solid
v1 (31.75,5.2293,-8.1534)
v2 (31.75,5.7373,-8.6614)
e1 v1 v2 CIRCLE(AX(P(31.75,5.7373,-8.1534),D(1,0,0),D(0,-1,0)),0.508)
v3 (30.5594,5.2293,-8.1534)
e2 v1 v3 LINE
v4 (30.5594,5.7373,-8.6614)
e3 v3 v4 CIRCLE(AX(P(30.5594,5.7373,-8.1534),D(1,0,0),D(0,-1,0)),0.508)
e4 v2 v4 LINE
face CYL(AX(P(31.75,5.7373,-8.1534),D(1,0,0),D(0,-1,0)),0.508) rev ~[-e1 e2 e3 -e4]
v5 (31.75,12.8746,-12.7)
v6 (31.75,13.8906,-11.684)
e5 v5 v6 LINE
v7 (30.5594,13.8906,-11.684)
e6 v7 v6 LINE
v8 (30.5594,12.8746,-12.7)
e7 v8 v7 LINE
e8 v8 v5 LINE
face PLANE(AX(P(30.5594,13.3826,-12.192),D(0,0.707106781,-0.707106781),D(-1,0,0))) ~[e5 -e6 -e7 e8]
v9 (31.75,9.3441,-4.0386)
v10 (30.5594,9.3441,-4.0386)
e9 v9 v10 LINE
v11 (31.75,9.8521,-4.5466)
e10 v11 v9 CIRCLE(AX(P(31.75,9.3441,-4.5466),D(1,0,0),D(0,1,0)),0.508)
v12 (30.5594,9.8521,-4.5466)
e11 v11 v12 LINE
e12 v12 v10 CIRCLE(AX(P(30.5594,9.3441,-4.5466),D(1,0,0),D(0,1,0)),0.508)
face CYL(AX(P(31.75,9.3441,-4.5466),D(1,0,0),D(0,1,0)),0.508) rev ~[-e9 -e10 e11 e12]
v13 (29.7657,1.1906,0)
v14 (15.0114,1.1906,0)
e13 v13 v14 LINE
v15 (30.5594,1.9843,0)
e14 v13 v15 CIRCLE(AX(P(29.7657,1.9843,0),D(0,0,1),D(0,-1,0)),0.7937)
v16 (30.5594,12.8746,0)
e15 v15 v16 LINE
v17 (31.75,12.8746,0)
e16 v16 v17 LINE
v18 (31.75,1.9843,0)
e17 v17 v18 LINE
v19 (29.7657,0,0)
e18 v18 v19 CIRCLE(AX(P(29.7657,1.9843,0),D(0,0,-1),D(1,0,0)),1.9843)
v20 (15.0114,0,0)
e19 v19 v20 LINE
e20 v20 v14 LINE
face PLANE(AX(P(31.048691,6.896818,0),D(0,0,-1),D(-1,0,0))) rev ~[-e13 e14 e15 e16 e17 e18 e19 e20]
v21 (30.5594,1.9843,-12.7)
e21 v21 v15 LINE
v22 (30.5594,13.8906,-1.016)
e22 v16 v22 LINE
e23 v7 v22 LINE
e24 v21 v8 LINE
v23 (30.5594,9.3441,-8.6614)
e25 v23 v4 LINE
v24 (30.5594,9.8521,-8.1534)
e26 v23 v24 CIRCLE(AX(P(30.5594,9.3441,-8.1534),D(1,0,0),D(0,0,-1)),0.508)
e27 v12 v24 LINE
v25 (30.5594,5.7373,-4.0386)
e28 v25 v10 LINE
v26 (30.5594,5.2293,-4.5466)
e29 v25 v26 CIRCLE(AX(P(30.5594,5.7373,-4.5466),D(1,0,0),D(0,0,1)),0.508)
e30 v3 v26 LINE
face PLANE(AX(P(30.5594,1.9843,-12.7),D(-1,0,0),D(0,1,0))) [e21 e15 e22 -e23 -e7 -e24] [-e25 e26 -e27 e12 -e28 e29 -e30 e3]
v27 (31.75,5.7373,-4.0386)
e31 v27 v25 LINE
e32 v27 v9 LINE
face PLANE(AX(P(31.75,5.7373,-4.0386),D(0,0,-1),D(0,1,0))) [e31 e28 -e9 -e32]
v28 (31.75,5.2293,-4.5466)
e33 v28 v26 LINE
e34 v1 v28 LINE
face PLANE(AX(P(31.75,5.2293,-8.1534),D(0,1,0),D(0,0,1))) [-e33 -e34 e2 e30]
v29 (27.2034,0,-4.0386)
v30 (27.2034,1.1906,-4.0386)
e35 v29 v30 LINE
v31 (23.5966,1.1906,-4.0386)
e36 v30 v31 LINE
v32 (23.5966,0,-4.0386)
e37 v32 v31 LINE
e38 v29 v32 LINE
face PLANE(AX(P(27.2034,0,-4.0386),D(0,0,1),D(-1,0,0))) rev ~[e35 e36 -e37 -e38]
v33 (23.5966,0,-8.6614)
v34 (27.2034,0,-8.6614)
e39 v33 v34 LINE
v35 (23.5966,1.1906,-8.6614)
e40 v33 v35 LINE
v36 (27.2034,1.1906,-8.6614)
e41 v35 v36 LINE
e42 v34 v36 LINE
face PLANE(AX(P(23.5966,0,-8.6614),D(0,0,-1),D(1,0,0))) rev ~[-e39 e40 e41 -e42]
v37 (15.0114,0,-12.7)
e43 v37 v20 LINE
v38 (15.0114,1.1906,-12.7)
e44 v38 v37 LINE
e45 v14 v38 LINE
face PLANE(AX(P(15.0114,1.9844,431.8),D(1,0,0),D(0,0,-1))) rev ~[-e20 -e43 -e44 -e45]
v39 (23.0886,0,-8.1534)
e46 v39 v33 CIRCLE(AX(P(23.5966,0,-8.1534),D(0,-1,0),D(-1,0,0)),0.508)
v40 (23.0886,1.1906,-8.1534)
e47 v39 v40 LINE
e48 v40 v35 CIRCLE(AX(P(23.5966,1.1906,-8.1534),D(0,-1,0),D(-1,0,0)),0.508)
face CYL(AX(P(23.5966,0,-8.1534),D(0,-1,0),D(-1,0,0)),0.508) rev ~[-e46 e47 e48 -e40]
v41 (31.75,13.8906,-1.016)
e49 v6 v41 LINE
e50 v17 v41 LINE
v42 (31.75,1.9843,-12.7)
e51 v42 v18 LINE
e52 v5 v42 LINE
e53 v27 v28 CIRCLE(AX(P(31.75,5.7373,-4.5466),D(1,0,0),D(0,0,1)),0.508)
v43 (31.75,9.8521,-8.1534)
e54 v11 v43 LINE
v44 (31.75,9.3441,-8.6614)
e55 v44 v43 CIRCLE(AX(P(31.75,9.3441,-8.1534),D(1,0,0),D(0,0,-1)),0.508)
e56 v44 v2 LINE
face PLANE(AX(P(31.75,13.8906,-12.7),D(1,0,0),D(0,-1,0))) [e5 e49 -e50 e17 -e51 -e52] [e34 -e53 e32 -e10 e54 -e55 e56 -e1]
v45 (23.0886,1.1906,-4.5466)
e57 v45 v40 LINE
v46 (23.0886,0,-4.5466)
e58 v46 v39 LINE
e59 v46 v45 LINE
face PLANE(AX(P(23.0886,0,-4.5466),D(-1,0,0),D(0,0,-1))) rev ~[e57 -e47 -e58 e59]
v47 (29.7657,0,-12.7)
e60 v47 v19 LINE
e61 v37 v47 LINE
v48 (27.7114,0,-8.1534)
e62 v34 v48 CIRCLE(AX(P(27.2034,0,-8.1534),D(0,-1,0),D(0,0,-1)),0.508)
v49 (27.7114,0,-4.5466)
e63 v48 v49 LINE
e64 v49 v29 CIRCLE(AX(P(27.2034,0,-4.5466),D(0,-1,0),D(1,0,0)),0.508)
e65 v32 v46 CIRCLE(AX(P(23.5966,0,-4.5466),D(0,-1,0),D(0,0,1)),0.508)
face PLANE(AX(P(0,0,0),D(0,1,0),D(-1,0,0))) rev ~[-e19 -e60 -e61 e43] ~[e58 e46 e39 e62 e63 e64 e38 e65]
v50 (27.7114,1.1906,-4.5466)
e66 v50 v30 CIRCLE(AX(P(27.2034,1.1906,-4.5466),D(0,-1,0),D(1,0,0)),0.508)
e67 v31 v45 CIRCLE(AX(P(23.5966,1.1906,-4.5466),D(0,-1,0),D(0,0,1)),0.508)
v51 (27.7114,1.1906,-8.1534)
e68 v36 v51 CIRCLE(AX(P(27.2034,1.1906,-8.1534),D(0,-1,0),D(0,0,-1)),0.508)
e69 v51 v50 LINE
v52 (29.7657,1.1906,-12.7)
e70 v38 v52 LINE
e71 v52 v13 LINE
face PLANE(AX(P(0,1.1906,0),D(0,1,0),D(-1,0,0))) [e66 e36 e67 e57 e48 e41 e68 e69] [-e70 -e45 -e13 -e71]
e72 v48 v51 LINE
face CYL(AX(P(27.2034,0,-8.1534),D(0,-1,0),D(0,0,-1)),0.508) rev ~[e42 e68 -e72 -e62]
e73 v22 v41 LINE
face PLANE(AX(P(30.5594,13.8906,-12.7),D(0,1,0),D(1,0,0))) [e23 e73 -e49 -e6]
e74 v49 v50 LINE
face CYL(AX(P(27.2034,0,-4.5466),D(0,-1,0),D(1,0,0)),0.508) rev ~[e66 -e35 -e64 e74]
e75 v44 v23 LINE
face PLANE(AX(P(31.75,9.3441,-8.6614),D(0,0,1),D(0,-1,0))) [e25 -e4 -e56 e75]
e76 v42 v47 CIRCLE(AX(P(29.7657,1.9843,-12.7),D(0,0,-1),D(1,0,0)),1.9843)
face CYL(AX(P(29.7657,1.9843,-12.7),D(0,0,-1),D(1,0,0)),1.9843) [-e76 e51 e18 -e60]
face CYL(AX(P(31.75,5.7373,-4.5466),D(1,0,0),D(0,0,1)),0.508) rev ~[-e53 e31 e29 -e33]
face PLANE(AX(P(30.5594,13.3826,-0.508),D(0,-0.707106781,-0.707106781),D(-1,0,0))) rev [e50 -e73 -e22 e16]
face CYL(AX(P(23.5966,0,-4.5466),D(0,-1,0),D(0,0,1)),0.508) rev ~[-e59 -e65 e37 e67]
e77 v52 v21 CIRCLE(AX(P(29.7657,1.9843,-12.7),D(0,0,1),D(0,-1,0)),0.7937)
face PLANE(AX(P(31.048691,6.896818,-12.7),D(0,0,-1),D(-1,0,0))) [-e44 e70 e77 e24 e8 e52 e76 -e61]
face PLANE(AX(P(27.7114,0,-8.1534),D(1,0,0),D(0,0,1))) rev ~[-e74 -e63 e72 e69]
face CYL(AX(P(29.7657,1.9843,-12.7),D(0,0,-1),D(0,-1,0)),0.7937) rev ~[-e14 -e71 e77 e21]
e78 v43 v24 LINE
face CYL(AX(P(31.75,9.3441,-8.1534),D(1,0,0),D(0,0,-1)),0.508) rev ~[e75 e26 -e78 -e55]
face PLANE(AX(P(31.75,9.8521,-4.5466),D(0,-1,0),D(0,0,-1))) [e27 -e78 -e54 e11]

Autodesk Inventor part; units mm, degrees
ref_plane "YZ Plane" through (0, 0, 0) normal (1, 0, 0) x (0, 1, 0)
ref_plane "XZ Plane" through (0, 0, 0) normal (0, 1, 0) x (-1, 0, 0)
sketch "Sketch1" plane through (0, 0, 0) normal (0, 1, 0) x (-1, 0, 0)
  line L0 (-31.75, 0) -> (31.75, 0)
  line L1 (31.75, 0) -> (31.75, -12.7)
  line L2 (31.75, -12.7) -> (-31.75, -12.7)
  line L3 (-31.75, -12.7) -> (-31.75, 0)
  line L4 (31.75, 0) -> (-31.75, -12.7) construction
  point P0 (0, 0)
  point P1 (0, 0)
  dimension "d0" = 63.5
  dimension "d1" = 12.7
extrude "Plate1" add sketch "Sketch1" along normal blind 1.1906
sketch "Sketch2" plane through (30.5594, 0, -12.7) normal (1, 0, 0) x (0, 1, 0)
  line L0 (0, 12.7) -> (0, 0)
  line L1 (0, 0) -> (13.8906, 0)
  line L2 (13.8906, 0) -> (13.8906, 12.7)
  line L3 (13.8906, 12.7) -> (0, 12.7)
edge flange "Flanges" height 12.7 angle 90 thickness 1.1906 bend radius 0.7937 thickness toward (1, 0, 0) relief tear relief width 1.1906 relief depth 0.5953 corner gap 1.1906 corner form 0 edges at (31.75, 1.1906, -6.35) (-31.75, 1.1906, -6.35) wall of the first edge with corners at (30.5594, 0, 0) (30.5594, 0, -12.7) (30.5594, 13.8906, -12.7) (30.5594, 13.8906, 0)
bend "Bend1"
corner "Corner1"
sketch "Sketch3" plane through (31.75, 1.9844, -12.7) normal (1, 0, 0) x (0, 0, -1)
  line L0 (-8.1534, 7.8677) -> (-4.5466, 7.8677)
  line L1 (-4.0386, 7.3597) -> (-4.0386, 3.7529)
  line L2 (-4.5466, 3.2449) -> (-8.1534, 3.2449)
  line L3 (-8.6614, 3.7529) -> (-8.6614, 7.3597)
  arc A0 (-8.1534, 7.8677) -> (-8.6614, 7.3597) centre (-8.1534, 7.3597) ccw
  arc A1 (-4.0386, 7.3597) -> (-4.5466, 7.8677) centre (-4.5466, 7.3597) ccw
  arc A2 (-4.5466, 3.2449) -> (-4.0386, 3.7529) centre (-4.5466, 3.7529) ccw
  arc A3 (-8.6614, 3.7529) -> (-8.1534, 3.2449) centre (-8.1534, 3.7529) ccw
  line L4 (-12.7, 0) -> (-12.7, 11.9063) construction
  line L5 (-12.7, 11.9063) -> (0, 11.9063) construction
  line L6 (-8.1534, 7.3597) -> (-4.5466, 3.7529) construction
  point P0 (-12.7, -1.9844)
  point P1 (-4.0386, 3.2449)
  point P2 (-8.6614, 3.2449)
  point P3 (-6.35, 5.5563)
  dimension "d16" = 4.6228
  dimension "d17" = 0.508
  dimension "d20" = 6.35
  dimension "d21" = 6.35
extrude "Flange Stamp" cut sketch "Sketch3" against normal blind 1.1906
sketch "Sketch7" plane through (31.75, 1.9844, 0) normal (1, 0, 0) x (0, 0, -1)
  arc A0 (4.5466, 7.8677) -> (4.0386, 7.3597) centre (4.5466, 7.3597) ccw construction
  arc A1 (8.1534, 3.2449) -> (8.6614, 3.7529) centre (8.1534, 3.7529) ccw construction
  circle A2 centre (6.35, 5.5563) radius 2.1844
  line L0 (4.5466, 7.3597) -> (8.1534, 3.7529) construction
  point P0 (0, -1.9844)
  dimension "d46" = 4.3688
surface extrude "Flange Circle" sketch "Sketch7" against normal up to surface (1.1906 mm away) shown yes curves A2
ref_plane "Flange Pattern Plane" through (31.75, 7.5406, -4.5466) normal (0, 1, 0) x (1, 0, 0)
feature "Flange Pattern" [suppressed]
sketch "Sketch8" plane through (0, 0, 0) normal (0, -1, 0) x (1, 0, 0)
  line L0 (29.7656, 0) -> (-29.7656, 0) construction
  line L1 (27.2034, -4.0386) -> (23.5966, -4.0386)
  line L2 (23.0886, -4.5466) -> (23.0886, -8.1534)
  line L3 (23.5966, -8.6614) -> (27.2034, -8.6614)
  line L4 (27.7114, -8.1534) -> (27.7114, -4.5466)
  arc A0 (27.7114, -4.5466) -> (27.2034, -4.0386) centre (27.2034, -4.5466) ccw
  arc A1 (27.2034, -8.6614) -> (27.7114, -8.1534) centre (27.2034, -8.1534) ccw
  arc A2 (23.0886, -8.1534) -> (23.5966, -8.6614) centre (23.5966, -8.1534) ccw
  arc A3 (23.5966, -4.0386) -> (23.0886, -4.5466) centre (23.5966, -4.5466) ccw
  line L5 (27.2034, -4.5466) -> (23.5966, -8.1534) construction
  line L6 (31.75, 0) -> (31.75, -12.7) construction
  point P0 (0, 0)
  point P1 (23.0886, -8.6614)
  point P2 (27.7114, -8.6614)
  point P3 (25.4, -6.35)
  dimension "d49" = 4.6228
  dimension "d50" = 0.508
  dimension "d51" = 6.35
  dimension "d52" = 6.35
extrude "Body Stamp" cut sketch "Sketch8" against normal blind 1.1906
sketch "Sketch9" plane through (0, 0, 0) normal (0, -1, 0) x (1, 0, 0)
  arc A0 (27.7114, -4.5466) -> (27.2034, -4.0386) centre (27.2034, -4.5466) ccw construction
  arc A1 (23.0886, -8.1534) -> (23.5966, -8.6614) centre (23.5966, -8.1534) ccw construction
  line L0 (27.2034, -4.5466) -> (23.5966, -8.1534) construction
  circle A2 centre (25.4, -6.35) radius 2.1844
  point P0 (0, 0)
  dimension "d55" = 4.3688
surface extrude "Body Circle" sketch "Sketch9" against normal up to surface (1.1906 mm away) shown yes curves A2
feature "Body Pattern" [suppressed]
sketch "Arc Length" plane through (30.5594, 1.9844, 0) normal (0, 0, 1) x (1, 0, 0)
  line L0 (0, 0) -> (1.1906, 0) construction
  arc A0 (-0.7938, -0.7938) -> (0, 0) centre (-0.7938, 0) ccw construction
  line L1 (-0.7938, -1.9844) -> (-0.7938, -0.7938) construction
  arc A1 (-0.7938, -1.9844) -> (1.1906, 0) centre (-0.7938, 0) ccw construction
  point P0 (-30.5594, -1.9844)
  dimension "d85" = 3.117
  dimension "d92" = 1.2468
sketch "Sketch13" plane through (31.75, 13.8906, 0) normal (1, 0, 0) x (0, 0, -1)
  line L0 (0, 0) -> (12.7, 0) construction
  line L1 (62.4078, 0) -> (63.4238, -1.016)
  line L2 (63.4238, -1.016) -> (64.4398, 0)
  line L3 (62.4078, 0) -> (64.4398, 0)
  line L4 (12.7, -11.9063) -> (0, -11.9063) construction
  line L5 (63.4238, -10.8903) -> (61.3168, -12.9972)
  line L6 (61.3168, -12.9972) -> (63.4238, -15.1042)
  line L7 (63.4238, -15.1042) -> (65.5308, -12.9972)
  line L8 (65.5308, -12.9972) -> (63.4238, -10.8903)
  line L9 (63.4238, -10.8903) -> (63.4238, -15.1042) construction
  line L10 (63.4238, -1.016) -> (63.4238, -10.8903) construction
  line L11 (0, -11.9063) -> (12.7, -11.9063) construction
  point P0 (0, -13.8906)
  dimension "d86" = 4.2139
  dimension "d88" = 1.016
  dimension "d91" = 1.016
  dimension "d102" = 63.4238
feature "Notch" [suppressed]
mirror "Notch Mirror" [suppressed]
pattern_linear "Notch Pattern" [suppressed]
chamfer "End Chamfer" distance 1.016 angle 45 4 edges at (-31.1547, 13.8906, -12.7) (31.1547, 13.8906, -12.7) (-31.1547, 13.8906, 0) (31.1547, 13.8906, 0)
sketch "Sketch14" plane through (-31.75, 1.9844, 431.8) normal (1, 0, 0) x (0, 0, -1)
  line L0 (431.8, 11.9063) -> (444.5, 11.9063) construction
  line L1 (431.8, 0) -> (431.8, 11.9063) construction
  line L2 (431.8, -1.9844) -> (444.5, -1.9844) construction
  line L3 (431.8, 11.9063) -> (444.5, 11.9063)
  line L4 (444.5, 11.9063) -> (444.5, -1.9844)
  line L5 (444.5, -1.9844) -> (431.8, -1.9844)
  line L6 (431.8, -1.9844) -> (431.8, 11.9063)
  point P0 (382.0521, -1.9844)
extrude "Half Cut" cut sketch "Sketch14" along normal blind 46.7614
sketch "Flange Pattern Sketch" plane through (31.75, 7.5406, -4.5466) normal (0, 1, 0) x (1, 0, 0)
  line L0 (0, 3.6068) -> (0, 0) construction
  line L1 (-76.2822, -4.5466) -> (13.1932, -4.5466) construction
  line L2 (0, 0) -> (-1.1906, 0) construction
  point P0 (-31.75, -4.5466)
  point P1 (0, 1.8034)
  point P2 (0, 14.5034)
  point P3 (0, 27.2034)
  point P4 (0, 39.9034)
  point P5 (0, 52.6034)
  point P6 (0, 65.3034)
  point P7 (0, 78.0034)
  point P8 (0, 90.7034)
  point P9 (0, 103.4034)
  point P10 (0, 116.1034)
  point P11 (0, 128.8034)
  point P12 (0, 141.5034)
  point P13 (0, 154.2034)
  point P14 (0, 166.9034)
  point P15 (0, 179.6034)
  point P16 (0, 192.3034)
  point P17 (0, 205.0034)
  point P18 (0, 217.7034)
  point P19 (0, 230.4034)
  point P20 (0, 243.1034)
  point P21 (0, 255.8034)
  point P22 (0, 268.5034)
  point P23 (0, 281.2034)
  point P24 (0, 293.9034)
  point P25 (0, 306.6034)
  point P26 (0, 319.3034)
  point P27 (0, 332.0034)
  point P28 (0, 344.7034)
  point P29 (0, 357.4034)
  point P30 (0, 370.1034)
  point P31 (0, 382.8034)
  point P32 (0, 395.5034)
  point P33 (0, 408.2034)
  point P34 (0, 420.9034)
  point P35 (0, 433.6034)
  dimension "d131" = 12.7
  dimension "d134" = 12.7
sketch "Body Pattern Sketch" plane through (0, 0, 0) normal (0, -1, 0) x (1, 0, 0)
  line L0 (29.7656, 0) -> (-29.7656, 0) construction
  line L1 (31.75, 0) -> (31.75, -12.7) construction
  circle A0 centre (25.4, -6.35) radius 2.1844 construction
  point P0 (0, 0)
  point P1 (25.4, -19.05)
  point P2 (25.4, -31.75)
  point P3 (25.4, -44.45)
  point P4 (25.4, -57.15)
  point P5 (25.4, -69.85)
  point P6 (25.4, -82.55)
  point P7 (25.4, -95.25)
  point P8 (25.4, -107.95)
  point P9 (25.4, -120.65)
  point P10 (25.4, -133.35)
  point P11 (25.4, -146.05)
  point P12 (25.4, -158.75)
  point P13 (25.4, -171.45)
  point P14 (25.4, -184.15)
  point P15 (25.4, -196.85)
  point P16 (25.4, -209.55)
  point P17 (25.4, -222.25)
  point P18 (25.4, -234.95)
  point P19 (25.4, -247.65)
  point P20 (25.4, -260.35)
  point P21 (25.4, -273.05)
  point P22 (25.4, -285.75)
  point P23 (25.4, -298.45)
  point P24 (25.4, -311.15)
  point P25 (25.4, -323.85)
  point P26 (25.4, -336.55)
  point P27 (25.4, -349.25)
  point P28 (25.4, -361.95)
  point P29 (25.4, -374.65)
  point P30 (25.4, -387.35)
  point P31 (25.4, -400.05)
  point P32 (25.4, -412.75)
  point P33 (25.4, -425.45)
  point P34 (25.4, -438.15)
  dimension "d62" = 12.7
  dimension "d65" = 12.7
  dimension "d139" = 12.7
equation "\"d1\" = 12.7 * Length"
equation "\"d18\" = Thickness"
equation "\"d53\" = Thickness"
equation "\"d89\" = Thickness"
equation "\"d2\" = Thickness"
equation "\"d3\" = BendReliefWidth"
equation "\"d4\" = BendReliefDepth"
equation "\"d5\" = MinimumRemnant"
equation "\"d6\" = TransitionRadius"
equation "\"d10\" = CornerReliefSize"
equation "\"d11\" = GapSize"
equation "\"d12\" = JacobiRadiusSize"
equation "\"BendRadius\" = Thickness"
equation "\"BendReliefWidth\" = Thickness"
equation "\"BendReliefDepth\" = 0.5 * Thickness"
equation "\"CornerReliefSize\" = 4 * Thickness"
equation "\"MinimumRemnant\" = 2 * Thickness"
equation "\"TransitionRadius\" = BendRadius"
equation "\"JacobiRadiusSize\" = BendRadius"
equation "\"GapSize\" = Thickness"
equation "\"Length\" = 1"
equation "\"Thickness\" = 1.190625"
properties part number "Alu C 1x3x1x35"
